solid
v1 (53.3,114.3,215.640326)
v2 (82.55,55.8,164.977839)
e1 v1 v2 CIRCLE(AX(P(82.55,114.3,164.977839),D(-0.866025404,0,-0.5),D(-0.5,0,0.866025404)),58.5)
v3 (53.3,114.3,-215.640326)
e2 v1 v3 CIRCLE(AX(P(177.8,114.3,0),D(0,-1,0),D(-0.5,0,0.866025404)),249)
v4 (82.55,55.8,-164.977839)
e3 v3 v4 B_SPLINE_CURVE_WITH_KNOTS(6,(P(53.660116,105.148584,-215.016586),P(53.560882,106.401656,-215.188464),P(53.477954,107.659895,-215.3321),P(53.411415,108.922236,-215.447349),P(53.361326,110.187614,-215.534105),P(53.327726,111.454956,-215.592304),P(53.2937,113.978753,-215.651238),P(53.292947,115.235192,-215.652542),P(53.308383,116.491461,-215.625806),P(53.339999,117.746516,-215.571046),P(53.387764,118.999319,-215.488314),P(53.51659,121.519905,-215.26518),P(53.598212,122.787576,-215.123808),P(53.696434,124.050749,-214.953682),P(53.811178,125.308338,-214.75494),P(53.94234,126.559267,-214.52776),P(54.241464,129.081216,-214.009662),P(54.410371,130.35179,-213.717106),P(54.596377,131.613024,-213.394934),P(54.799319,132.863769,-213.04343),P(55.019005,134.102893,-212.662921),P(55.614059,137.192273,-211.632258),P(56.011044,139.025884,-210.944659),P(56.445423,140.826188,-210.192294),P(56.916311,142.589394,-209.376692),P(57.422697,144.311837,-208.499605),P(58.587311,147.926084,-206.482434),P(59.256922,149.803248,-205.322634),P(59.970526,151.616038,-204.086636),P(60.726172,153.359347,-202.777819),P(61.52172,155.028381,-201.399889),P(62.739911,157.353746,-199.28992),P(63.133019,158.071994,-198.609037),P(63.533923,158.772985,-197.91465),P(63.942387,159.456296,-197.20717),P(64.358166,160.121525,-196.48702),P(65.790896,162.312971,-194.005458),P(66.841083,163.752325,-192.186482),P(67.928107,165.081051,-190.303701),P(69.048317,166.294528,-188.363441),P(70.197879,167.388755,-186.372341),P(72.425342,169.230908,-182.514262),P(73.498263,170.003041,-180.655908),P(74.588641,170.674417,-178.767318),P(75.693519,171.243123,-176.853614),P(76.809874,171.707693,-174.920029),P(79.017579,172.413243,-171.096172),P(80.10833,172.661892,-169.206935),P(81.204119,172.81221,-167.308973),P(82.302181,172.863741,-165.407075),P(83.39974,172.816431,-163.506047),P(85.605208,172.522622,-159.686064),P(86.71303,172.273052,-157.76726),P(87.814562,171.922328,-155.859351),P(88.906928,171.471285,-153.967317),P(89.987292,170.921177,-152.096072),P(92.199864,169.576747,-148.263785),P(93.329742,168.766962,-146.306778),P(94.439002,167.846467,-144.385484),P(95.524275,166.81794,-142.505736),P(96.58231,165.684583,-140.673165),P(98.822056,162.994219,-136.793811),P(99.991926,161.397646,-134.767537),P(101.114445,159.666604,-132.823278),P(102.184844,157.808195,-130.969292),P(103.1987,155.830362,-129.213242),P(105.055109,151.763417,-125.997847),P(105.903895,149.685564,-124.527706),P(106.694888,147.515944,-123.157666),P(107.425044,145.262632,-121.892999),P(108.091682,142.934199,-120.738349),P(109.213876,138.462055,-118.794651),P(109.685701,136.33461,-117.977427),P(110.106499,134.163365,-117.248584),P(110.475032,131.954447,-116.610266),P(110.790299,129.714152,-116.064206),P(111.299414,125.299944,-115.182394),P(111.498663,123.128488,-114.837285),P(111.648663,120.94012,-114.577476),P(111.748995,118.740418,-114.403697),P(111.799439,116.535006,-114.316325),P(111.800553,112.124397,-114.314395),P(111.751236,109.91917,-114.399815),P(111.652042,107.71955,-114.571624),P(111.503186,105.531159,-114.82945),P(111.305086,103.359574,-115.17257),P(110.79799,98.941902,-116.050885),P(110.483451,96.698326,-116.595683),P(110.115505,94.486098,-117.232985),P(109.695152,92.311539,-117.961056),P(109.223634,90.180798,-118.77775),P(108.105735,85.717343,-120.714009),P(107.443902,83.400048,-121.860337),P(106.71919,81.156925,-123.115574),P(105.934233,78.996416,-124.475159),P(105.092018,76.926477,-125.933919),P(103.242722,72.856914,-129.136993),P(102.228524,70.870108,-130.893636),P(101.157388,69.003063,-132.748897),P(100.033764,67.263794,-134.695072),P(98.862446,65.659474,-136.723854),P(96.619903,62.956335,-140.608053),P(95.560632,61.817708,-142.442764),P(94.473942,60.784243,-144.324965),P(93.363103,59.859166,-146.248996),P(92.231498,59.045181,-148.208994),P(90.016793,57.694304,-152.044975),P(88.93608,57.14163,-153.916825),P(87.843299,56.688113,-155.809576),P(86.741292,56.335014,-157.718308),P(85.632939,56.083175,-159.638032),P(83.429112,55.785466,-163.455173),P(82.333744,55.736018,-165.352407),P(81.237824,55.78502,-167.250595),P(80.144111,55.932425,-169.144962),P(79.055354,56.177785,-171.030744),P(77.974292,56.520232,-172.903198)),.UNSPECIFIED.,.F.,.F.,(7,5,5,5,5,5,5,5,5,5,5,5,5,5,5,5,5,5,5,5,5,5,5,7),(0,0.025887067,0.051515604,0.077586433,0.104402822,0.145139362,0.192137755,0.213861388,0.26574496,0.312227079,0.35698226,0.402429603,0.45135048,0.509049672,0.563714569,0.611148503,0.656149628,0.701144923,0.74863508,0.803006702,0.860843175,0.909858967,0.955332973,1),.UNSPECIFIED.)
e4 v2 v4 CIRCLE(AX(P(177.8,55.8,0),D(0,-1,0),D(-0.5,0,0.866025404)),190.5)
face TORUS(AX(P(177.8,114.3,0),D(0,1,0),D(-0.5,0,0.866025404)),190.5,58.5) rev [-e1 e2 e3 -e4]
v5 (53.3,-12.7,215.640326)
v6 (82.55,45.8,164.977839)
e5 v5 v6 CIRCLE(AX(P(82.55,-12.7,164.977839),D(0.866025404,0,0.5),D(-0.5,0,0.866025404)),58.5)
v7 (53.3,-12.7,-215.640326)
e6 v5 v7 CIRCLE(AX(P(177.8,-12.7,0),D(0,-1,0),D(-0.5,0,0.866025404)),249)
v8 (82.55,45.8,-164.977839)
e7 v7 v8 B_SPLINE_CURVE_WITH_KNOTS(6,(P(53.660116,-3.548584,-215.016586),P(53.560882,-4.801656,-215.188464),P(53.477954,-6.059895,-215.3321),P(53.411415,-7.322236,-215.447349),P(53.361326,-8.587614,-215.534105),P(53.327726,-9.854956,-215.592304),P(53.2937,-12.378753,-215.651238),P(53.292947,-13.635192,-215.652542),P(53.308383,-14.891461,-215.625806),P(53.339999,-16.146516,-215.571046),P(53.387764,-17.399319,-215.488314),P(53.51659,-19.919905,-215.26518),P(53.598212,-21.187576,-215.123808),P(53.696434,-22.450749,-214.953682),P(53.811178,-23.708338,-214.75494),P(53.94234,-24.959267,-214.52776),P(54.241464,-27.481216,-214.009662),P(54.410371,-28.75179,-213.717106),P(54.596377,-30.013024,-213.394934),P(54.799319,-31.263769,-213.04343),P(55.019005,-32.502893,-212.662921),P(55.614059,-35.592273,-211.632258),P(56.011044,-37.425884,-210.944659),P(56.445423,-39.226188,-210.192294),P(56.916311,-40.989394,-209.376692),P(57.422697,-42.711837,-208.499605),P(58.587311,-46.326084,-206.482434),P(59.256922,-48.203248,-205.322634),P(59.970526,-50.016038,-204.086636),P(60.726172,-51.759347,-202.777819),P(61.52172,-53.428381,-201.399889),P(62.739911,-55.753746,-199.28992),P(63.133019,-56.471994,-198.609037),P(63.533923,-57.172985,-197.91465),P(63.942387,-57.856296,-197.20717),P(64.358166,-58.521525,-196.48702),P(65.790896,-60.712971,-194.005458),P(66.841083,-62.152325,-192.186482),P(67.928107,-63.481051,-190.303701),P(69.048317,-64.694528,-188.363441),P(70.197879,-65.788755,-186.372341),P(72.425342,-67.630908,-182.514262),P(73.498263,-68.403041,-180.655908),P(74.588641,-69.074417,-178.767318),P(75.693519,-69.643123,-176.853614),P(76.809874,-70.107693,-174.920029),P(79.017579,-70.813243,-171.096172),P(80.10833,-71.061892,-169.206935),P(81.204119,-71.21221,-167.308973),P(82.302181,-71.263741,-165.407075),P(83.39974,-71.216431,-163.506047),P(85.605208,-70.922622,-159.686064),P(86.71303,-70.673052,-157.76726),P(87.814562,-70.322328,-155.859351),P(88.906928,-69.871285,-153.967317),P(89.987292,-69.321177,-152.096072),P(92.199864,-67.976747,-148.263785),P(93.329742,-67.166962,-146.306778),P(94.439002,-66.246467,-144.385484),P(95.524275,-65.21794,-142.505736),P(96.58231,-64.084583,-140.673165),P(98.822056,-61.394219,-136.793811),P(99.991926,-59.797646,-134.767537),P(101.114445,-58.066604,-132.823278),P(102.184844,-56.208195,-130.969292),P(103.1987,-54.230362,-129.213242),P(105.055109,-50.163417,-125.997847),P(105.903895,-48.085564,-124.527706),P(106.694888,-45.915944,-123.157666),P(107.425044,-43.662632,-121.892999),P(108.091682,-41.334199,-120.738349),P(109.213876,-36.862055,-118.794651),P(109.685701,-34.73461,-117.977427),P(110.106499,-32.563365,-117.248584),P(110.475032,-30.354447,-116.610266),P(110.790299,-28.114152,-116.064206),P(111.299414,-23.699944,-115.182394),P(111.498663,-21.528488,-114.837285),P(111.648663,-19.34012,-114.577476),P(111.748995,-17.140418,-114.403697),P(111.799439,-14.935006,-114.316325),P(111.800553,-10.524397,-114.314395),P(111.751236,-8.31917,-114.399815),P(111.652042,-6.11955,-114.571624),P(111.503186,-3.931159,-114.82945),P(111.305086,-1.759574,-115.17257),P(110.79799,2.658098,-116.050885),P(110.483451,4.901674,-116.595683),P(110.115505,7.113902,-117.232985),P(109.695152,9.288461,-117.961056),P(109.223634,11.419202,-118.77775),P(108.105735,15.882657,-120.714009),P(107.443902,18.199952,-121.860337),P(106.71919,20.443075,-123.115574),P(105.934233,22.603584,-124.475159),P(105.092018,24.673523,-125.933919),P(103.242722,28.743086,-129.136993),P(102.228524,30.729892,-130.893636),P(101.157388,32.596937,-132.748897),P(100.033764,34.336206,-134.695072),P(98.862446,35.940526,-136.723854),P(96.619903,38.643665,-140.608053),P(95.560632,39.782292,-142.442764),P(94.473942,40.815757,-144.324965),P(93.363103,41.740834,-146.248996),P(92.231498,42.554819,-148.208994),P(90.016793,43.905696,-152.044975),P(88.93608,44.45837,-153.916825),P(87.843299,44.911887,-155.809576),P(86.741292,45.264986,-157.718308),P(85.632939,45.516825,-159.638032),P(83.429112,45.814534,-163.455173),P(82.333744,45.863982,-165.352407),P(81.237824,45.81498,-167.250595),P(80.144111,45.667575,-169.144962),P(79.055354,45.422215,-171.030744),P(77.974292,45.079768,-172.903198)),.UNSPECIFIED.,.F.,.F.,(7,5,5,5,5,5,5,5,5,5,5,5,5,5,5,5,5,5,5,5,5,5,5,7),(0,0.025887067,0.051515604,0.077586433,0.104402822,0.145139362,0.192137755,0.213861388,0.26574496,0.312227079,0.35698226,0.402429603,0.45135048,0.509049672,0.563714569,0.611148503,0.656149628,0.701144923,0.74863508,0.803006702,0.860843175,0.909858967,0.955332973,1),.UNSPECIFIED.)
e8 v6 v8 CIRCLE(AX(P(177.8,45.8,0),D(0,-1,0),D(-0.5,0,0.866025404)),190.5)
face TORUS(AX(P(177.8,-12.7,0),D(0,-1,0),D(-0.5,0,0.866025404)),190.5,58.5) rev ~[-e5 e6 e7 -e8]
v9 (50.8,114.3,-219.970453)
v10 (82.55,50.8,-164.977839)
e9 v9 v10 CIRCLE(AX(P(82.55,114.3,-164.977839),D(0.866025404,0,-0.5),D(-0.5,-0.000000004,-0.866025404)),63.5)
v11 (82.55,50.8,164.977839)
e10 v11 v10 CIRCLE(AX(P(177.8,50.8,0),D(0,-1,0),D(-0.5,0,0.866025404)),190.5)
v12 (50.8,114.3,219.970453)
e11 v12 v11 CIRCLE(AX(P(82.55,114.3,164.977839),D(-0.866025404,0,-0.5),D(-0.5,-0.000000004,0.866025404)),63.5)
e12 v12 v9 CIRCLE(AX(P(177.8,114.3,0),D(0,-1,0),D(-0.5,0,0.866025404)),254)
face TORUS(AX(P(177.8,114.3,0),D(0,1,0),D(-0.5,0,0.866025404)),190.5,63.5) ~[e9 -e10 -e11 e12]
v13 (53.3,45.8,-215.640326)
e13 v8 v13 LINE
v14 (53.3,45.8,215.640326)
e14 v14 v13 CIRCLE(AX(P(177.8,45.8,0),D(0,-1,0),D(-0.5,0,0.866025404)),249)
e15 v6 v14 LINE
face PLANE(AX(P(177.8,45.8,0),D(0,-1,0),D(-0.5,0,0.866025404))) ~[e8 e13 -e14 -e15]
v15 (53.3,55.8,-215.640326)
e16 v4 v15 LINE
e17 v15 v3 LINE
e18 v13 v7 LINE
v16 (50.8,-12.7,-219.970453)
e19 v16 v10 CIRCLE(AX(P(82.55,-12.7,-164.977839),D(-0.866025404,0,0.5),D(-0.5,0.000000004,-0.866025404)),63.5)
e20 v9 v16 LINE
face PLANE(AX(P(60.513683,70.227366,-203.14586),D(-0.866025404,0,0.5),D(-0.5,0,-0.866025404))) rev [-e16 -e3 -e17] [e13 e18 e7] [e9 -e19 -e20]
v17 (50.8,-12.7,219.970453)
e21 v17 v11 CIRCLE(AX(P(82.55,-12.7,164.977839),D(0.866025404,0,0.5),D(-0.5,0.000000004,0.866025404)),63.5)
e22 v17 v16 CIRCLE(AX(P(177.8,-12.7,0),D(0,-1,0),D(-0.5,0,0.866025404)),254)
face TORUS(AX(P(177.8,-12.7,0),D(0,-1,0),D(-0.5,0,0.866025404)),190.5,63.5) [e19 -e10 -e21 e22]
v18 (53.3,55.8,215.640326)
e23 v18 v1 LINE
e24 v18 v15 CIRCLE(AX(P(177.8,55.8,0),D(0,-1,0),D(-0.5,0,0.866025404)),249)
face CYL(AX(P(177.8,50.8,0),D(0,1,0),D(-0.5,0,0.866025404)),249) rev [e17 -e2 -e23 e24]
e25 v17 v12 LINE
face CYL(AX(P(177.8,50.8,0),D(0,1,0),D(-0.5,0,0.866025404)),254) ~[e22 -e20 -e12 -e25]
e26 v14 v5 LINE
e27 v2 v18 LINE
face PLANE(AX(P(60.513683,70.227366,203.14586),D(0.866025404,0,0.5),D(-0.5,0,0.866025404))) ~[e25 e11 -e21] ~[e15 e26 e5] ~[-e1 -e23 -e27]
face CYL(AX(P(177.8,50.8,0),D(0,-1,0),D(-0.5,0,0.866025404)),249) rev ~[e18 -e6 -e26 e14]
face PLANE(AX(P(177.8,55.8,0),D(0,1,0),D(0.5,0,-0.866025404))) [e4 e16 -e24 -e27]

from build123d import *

# Parameters (mm, degrees)
F1_ANGLE_BACK = 60
F1_ANGLE      = 120
F2_T          = -5


with BuildPart() as f1:
    # F0 (on Top) → F1 (revolve)
    with BuildSketch(Plane.XY, mode=Mode.PRIVATE) as f1_sk:
        with BuildLine():
            Line((-12.6999996577, 50.8), (-76.2, 50.8))
            Line((-76.2, 50.8), (-76.2, -12.6999997152))
            ThreePointArc((-76.2, -12.6999997152), (-57.6012803836, 32.2012808271), (-12.6999996577, 50.8))
        make_face()
        with BuildLine():
            ThreePointArc((50.8, -12.7), (32.2012807264, 32.2012804843), (-12.6999996577, 50.8))
            ThreePointArc((-12.6999996577, 50.8), (-57.6012803836, 32.2012808271), (-76.2, -12.6999997152))
            ThreePointArc((-76.2, -12.6999997152), (-12.7000001424, -76.2), (50.8, -12.7))
        make_face()
    revolve(f1_sk.sketch.rotate(Axis((177.8, -25.4, 0), (0, -1, 0)), -F1_ANGLE_BACK), axis=Axis((177.8, -25.4, 0), (0, -1, 0)), revolution_arc=F1_ANGLE)

    # F2
    f2_openings = [f1.faces().sort_by_distance(p)[0] for p in [
        (80.973313, -9.546627, 167.708741),
        (80.973313, -9.546627, -167.708741),
    ]]
    offset(amount=F2_T, openings=f2_openings, kind=Kind.INTERSECTION)

    # F4: F1 across plane


with BuildPart() as f1_1:
    add(f1.part)
    add(f1.part.mirror(Plane(origin=(-7.2496055577, 50.8, 0), x_dir=(-1, 0, 0), z_dir=(0, 1, 0))))


solid = f1_1.part
